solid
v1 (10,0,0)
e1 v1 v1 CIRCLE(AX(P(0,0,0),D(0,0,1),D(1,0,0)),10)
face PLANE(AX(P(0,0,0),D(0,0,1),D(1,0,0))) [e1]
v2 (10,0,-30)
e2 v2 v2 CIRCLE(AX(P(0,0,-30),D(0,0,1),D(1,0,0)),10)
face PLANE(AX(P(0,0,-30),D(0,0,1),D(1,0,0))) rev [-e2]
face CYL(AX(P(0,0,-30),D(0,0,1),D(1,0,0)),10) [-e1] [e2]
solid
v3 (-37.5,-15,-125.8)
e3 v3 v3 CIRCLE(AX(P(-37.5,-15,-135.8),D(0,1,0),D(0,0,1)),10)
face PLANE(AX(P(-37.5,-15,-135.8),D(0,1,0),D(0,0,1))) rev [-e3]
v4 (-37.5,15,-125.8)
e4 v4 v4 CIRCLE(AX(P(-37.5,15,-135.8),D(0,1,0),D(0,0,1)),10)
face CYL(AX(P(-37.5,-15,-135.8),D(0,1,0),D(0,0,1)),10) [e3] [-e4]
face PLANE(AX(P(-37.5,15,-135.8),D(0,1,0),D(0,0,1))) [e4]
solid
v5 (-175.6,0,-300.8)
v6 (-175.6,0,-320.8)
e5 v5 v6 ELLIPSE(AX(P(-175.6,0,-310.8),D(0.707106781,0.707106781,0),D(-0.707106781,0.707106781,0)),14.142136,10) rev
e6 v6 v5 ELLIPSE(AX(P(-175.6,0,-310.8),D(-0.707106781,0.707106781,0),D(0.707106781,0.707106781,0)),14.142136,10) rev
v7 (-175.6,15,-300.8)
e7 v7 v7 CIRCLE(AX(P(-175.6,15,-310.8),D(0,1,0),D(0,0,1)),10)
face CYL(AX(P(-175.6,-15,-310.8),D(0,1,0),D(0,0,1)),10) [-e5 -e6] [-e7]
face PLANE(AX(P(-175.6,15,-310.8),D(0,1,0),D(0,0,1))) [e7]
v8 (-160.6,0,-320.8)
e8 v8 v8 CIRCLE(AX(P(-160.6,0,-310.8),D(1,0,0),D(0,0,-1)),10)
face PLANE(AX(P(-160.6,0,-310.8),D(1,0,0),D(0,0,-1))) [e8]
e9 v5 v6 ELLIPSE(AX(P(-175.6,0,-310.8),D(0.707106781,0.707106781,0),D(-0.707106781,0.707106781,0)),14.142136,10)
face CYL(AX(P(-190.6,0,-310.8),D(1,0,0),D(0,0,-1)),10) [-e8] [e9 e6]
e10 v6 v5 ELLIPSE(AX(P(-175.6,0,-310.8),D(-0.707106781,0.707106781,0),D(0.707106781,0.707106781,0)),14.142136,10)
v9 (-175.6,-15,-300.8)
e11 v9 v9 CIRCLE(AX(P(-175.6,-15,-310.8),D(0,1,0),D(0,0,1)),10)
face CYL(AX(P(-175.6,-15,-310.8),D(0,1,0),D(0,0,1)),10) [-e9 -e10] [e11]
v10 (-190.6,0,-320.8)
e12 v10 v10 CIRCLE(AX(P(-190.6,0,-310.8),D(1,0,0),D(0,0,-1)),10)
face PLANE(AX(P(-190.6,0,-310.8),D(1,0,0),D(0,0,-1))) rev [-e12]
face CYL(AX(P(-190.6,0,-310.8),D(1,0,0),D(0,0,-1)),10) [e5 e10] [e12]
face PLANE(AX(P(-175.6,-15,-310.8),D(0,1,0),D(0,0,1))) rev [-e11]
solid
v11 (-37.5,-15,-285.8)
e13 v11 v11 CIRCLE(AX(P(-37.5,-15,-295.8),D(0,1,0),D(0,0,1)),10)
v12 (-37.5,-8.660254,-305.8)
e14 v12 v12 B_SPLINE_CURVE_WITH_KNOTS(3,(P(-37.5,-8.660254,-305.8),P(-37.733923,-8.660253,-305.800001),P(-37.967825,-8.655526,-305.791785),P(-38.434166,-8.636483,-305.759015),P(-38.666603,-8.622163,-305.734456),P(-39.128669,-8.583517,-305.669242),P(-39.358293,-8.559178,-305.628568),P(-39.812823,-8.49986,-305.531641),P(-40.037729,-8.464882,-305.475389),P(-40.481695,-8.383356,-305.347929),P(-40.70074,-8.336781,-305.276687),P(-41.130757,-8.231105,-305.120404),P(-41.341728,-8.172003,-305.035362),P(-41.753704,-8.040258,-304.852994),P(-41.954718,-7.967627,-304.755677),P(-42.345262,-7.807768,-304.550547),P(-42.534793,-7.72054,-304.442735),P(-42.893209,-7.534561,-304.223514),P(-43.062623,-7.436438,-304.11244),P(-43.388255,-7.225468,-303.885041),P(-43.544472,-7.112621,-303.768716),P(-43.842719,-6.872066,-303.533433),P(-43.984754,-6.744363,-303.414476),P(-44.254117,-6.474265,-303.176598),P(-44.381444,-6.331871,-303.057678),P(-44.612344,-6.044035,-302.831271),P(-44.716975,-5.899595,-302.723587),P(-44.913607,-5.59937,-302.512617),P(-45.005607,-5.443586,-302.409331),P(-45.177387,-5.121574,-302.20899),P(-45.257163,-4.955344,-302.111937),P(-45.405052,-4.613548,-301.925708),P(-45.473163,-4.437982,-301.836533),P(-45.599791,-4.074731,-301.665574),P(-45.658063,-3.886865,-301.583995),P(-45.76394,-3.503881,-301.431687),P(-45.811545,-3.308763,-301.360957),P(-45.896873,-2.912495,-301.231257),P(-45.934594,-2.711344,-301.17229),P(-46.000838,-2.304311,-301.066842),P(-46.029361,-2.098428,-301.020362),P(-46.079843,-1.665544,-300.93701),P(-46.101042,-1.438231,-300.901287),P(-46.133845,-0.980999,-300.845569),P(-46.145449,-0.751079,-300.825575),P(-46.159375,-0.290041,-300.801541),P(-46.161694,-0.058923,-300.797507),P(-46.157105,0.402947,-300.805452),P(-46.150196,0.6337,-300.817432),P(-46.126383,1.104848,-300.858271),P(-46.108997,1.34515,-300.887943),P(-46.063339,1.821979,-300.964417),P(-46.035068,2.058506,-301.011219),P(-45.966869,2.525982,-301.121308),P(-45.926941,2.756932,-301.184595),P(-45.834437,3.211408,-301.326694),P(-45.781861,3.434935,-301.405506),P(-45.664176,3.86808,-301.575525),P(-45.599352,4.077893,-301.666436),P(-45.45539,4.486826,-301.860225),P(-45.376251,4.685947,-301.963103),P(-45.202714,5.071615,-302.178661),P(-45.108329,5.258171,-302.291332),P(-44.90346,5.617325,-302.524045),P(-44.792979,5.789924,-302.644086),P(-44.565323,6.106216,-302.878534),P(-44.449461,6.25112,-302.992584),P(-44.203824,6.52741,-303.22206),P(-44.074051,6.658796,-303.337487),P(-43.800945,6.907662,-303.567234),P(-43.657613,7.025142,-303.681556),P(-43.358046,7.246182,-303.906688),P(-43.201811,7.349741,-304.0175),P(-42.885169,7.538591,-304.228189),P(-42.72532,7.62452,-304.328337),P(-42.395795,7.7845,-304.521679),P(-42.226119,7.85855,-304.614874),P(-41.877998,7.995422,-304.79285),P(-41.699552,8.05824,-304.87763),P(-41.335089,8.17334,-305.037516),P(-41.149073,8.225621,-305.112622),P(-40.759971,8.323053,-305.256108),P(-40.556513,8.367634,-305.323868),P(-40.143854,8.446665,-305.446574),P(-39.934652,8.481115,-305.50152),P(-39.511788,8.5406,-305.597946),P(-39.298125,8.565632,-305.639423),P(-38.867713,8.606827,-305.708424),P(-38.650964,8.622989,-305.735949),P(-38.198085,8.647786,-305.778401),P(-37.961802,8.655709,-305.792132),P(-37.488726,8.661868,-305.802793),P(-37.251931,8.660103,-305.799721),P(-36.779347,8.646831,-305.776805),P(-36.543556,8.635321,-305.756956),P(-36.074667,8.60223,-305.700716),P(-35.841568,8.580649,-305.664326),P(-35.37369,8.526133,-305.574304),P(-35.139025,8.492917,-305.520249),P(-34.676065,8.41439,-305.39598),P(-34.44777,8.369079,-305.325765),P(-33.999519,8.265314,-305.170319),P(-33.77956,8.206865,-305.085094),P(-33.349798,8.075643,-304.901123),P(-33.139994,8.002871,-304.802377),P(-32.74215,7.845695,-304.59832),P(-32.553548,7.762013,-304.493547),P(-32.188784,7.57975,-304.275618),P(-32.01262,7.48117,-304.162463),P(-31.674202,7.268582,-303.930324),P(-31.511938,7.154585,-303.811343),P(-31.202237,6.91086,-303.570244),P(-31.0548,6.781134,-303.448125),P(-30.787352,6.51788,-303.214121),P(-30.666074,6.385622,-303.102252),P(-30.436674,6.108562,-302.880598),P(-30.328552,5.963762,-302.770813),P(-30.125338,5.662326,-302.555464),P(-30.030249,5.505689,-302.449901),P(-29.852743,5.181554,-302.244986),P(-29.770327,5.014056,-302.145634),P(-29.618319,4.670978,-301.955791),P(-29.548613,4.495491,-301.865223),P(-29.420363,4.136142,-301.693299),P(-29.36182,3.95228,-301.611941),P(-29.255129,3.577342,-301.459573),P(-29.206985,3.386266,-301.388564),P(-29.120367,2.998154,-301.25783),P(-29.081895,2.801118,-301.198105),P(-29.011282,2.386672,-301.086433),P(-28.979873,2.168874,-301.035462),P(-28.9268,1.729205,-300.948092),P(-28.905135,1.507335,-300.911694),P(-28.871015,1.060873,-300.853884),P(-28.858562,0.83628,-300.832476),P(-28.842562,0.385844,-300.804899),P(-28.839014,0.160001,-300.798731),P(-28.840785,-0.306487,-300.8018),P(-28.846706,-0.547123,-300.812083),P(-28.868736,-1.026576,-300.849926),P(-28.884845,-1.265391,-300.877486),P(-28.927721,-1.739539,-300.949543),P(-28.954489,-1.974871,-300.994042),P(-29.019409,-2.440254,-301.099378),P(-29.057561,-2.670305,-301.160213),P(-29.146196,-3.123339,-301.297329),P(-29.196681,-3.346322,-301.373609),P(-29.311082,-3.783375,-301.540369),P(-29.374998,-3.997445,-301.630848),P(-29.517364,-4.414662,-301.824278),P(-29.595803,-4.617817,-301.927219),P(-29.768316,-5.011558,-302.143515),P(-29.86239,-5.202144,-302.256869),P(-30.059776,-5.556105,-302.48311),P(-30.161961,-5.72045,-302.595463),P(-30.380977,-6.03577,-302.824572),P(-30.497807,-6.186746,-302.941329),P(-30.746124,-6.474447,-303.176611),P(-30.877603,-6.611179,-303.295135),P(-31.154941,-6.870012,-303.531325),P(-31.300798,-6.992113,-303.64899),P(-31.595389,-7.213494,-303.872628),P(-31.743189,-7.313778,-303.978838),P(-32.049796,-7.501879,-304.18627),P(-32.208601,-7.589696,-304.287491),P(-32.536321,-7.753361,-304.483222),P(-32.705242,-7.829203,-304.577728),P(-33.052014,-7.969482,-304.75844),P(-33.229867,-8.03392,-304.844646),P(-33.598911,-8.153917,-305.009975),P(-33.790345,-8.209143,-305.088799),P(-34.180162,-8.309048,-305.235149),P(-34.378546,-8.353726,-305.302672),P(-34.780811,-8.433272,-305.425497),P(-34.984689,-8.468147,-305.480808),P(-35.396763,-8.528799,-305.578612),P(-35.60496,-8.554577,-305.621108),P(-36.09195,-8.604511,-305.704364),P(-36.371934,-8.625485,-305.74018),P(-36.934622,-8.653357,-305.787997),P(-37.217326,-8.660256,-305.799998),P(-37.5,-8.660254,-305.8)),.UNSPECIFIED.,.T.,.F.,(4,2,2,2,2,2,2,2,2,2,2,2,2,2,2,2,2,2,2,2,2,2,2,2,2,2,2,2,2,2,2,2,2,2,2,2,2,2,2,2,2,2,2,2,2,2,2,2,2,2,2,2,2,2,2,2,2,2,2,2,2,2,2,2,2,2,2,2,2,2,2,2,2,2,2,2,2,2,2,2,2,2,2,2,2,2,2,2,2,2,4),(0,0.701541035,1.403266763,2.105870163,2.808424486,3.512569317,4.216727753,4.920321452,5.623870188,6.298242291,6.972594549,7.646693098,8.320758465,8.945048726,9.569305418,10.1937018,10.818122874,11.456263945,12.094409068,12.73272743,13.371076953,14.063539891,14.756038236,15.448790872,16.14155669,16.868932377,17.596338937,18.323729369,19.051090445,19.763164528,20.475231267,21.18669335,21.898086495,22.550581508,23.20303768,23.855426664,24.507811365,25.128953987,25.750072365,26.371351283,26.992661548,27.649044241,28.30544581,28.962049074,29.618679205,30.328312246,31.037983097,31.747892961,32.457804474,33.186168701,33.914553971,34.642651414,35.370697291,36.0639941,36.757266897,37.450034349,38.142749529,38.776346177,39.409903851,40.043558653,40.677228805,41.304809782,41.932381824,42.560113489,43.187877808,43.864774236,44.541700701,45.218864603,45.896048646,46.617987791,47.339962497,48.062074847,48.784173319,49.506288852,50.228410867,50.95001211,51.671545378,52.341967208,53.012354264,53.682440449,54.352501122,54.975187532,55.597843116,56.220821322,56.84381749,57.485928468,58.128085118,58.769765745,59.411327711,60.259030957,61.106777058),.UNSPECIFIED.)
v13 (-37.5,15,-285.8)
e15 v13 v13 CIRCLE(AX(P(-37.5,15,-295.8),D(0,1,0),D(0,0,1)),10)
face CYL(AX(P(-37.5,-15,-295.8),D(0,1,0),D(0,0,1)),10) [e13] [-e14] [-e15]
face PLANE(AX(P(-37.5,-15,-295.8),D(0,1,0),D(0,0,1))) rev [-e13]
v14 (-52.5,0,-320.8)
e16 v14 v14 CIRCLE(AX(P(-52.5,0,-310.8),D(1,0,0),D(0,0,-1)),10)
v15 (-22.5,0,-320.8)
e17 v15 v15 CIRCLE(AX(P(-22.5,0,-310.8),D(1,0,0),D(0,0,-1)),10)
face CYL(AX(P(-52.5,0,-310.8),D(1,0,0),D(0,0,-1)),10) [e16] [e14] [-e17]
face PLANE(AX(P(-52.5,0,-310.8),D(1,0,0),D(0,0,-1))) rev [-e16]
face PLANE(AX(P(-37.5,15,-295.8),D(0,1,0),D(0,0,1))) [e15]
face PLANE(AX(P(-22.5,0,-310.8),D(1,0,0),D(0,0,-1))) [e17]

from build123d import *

# Parameters (mm, degrees)
SKETCH2_R                  = 10
BOSS_EXTRUDE1_DEPTH        = 30
BOSS_EXTRUDE3_DEPTH        = 15
BOSS_EXTRUDE3_DEPTH_BACK   = 15
SKETCH4_R                  = 10
BOSS_EXTRUDE3_2_DEPTH      = 15
BOSS_EXTRUDE3_2_DEPTH_BACK = 15
BOSS_EXTRUDE3_3_DEPTH      = 15
BOSS_EXTRUDE3_3_DEPTH_BACK = 15
BOSS_EXTRUDE4_DEPTH        = 15
BOSS_EXTRUDE4_DEPTH_BACK   = 15
SKETCH5_R                  = 10
BOSS_EXTRUDE5_DEPTH        = 15
BOSS_EXTRUDE5_DEPTH_BACK   = 15
SKETCH6_R                  = 10


with BuildPart() as part:
    # Sketch2 → Boss-Extrude1 (new body)
    with BuildSketch(Plane.XY):
        Circle(SKETCH2_R)
    extrude(amount=-BOSS_EXTRUDE1_DEPTH)


with BuildPart() as body_2:
    # Sketch4 → Boss-Extrude3 (new, two sides: drawn at the far end of the back side and taken through both)
    with BuildSketch(Plane(origin=(0, 0, 0), x_dir=(1, 0, 0), z_dir=(0, 1, 0)).offset(-BOSS_EXTRUDE3_DEPTH_BACK)):
        with Locations((-37.5, 135.8)):
            Circle(SKETCH4_R)
    extrude(amount=BOSS_EXTRUDE3_DEPTH + BOSS_EXTRUDE3_DEPTH_BACK)


with BuildPart() as body_3:
    # Sketch4 → Boss-Extrude3 2 (new, two sides: drawn at the far end of the back side and taken through both)
    with BuildSketch(Plane(origin=(0, 0, 0), x_dir=(1, 0, 0), z_dir=(0, 1, 0)).offset(-BOSS_EXTRUDE3_2_DEPTH_BACK)):
        with Locations((-37.5, 295.8)):
            Circle(SKETCH4_R)
    extrude(amount=BOSS_EXTRUDE3_2_DEPTH + BOSS_EXTRUDE3_2_DEPTH_BACK)

    # Sketch5 → Boss-Extrude4 (add, two sides: drawn at the far end of the back side and taken through both)
    with BuildSketch(Plane(origin=(-37.5, 0, 0), x_dir=(0, 0, -1), z_dir=(1, 0, 0)).offset(-BOSS_EXTRUDE4_DEPTH_BACK)):
        with Locations((310.8, 0)):
            Circle(SKETCH5_R)
    extrude(amount=BOSS_EXTRUDE4_DEPTH + BOSS_EXTRUDE4_DEPTH_BACK)


with BuildPart() as body_4:
    # Sketch4 → Boss-Extrude3 3 (new, two sides: drawn at the far end of the back side and taken through both)
    with BuildSketch(Plane(origin=(0, 0, 0), x_dir=(1, 0, 0), z_dir=(0, 1, 0)).offset(-BOSS_EXTRUDE3_3_DEPTH_BACK)):
        with Locations((-175.6, 310.8)):
            Circle(SKETCH4_R)
    extrude(amount=BOSS_EXTRUDE3_3_DEPTH + BOSS_EXTRUDE3_3_DEPTH_BACK)

    # Sketch6 → Boss-Extrude5 (add, two sides: drawn at the far end of the back side and taken through both)
    with BuildSketch(Plane(origin=(-175.6, 0, 0), x_dir=(0, 0, -1), z_dir=(1, 0, 0)).offset(-BOSS_EXTRUDE5_DEPTH_BACK)):
        with Locations((310.8, 0)):
            Circle(SKETCH6_R)
    extrude(amount=BOSS_EXTRUDE5_DEPTH + BOSS_EXTRUDE5_DEPTH_BACK)


solid = Compound([part.part, body_2.part, body_3.part, body_4.part])
